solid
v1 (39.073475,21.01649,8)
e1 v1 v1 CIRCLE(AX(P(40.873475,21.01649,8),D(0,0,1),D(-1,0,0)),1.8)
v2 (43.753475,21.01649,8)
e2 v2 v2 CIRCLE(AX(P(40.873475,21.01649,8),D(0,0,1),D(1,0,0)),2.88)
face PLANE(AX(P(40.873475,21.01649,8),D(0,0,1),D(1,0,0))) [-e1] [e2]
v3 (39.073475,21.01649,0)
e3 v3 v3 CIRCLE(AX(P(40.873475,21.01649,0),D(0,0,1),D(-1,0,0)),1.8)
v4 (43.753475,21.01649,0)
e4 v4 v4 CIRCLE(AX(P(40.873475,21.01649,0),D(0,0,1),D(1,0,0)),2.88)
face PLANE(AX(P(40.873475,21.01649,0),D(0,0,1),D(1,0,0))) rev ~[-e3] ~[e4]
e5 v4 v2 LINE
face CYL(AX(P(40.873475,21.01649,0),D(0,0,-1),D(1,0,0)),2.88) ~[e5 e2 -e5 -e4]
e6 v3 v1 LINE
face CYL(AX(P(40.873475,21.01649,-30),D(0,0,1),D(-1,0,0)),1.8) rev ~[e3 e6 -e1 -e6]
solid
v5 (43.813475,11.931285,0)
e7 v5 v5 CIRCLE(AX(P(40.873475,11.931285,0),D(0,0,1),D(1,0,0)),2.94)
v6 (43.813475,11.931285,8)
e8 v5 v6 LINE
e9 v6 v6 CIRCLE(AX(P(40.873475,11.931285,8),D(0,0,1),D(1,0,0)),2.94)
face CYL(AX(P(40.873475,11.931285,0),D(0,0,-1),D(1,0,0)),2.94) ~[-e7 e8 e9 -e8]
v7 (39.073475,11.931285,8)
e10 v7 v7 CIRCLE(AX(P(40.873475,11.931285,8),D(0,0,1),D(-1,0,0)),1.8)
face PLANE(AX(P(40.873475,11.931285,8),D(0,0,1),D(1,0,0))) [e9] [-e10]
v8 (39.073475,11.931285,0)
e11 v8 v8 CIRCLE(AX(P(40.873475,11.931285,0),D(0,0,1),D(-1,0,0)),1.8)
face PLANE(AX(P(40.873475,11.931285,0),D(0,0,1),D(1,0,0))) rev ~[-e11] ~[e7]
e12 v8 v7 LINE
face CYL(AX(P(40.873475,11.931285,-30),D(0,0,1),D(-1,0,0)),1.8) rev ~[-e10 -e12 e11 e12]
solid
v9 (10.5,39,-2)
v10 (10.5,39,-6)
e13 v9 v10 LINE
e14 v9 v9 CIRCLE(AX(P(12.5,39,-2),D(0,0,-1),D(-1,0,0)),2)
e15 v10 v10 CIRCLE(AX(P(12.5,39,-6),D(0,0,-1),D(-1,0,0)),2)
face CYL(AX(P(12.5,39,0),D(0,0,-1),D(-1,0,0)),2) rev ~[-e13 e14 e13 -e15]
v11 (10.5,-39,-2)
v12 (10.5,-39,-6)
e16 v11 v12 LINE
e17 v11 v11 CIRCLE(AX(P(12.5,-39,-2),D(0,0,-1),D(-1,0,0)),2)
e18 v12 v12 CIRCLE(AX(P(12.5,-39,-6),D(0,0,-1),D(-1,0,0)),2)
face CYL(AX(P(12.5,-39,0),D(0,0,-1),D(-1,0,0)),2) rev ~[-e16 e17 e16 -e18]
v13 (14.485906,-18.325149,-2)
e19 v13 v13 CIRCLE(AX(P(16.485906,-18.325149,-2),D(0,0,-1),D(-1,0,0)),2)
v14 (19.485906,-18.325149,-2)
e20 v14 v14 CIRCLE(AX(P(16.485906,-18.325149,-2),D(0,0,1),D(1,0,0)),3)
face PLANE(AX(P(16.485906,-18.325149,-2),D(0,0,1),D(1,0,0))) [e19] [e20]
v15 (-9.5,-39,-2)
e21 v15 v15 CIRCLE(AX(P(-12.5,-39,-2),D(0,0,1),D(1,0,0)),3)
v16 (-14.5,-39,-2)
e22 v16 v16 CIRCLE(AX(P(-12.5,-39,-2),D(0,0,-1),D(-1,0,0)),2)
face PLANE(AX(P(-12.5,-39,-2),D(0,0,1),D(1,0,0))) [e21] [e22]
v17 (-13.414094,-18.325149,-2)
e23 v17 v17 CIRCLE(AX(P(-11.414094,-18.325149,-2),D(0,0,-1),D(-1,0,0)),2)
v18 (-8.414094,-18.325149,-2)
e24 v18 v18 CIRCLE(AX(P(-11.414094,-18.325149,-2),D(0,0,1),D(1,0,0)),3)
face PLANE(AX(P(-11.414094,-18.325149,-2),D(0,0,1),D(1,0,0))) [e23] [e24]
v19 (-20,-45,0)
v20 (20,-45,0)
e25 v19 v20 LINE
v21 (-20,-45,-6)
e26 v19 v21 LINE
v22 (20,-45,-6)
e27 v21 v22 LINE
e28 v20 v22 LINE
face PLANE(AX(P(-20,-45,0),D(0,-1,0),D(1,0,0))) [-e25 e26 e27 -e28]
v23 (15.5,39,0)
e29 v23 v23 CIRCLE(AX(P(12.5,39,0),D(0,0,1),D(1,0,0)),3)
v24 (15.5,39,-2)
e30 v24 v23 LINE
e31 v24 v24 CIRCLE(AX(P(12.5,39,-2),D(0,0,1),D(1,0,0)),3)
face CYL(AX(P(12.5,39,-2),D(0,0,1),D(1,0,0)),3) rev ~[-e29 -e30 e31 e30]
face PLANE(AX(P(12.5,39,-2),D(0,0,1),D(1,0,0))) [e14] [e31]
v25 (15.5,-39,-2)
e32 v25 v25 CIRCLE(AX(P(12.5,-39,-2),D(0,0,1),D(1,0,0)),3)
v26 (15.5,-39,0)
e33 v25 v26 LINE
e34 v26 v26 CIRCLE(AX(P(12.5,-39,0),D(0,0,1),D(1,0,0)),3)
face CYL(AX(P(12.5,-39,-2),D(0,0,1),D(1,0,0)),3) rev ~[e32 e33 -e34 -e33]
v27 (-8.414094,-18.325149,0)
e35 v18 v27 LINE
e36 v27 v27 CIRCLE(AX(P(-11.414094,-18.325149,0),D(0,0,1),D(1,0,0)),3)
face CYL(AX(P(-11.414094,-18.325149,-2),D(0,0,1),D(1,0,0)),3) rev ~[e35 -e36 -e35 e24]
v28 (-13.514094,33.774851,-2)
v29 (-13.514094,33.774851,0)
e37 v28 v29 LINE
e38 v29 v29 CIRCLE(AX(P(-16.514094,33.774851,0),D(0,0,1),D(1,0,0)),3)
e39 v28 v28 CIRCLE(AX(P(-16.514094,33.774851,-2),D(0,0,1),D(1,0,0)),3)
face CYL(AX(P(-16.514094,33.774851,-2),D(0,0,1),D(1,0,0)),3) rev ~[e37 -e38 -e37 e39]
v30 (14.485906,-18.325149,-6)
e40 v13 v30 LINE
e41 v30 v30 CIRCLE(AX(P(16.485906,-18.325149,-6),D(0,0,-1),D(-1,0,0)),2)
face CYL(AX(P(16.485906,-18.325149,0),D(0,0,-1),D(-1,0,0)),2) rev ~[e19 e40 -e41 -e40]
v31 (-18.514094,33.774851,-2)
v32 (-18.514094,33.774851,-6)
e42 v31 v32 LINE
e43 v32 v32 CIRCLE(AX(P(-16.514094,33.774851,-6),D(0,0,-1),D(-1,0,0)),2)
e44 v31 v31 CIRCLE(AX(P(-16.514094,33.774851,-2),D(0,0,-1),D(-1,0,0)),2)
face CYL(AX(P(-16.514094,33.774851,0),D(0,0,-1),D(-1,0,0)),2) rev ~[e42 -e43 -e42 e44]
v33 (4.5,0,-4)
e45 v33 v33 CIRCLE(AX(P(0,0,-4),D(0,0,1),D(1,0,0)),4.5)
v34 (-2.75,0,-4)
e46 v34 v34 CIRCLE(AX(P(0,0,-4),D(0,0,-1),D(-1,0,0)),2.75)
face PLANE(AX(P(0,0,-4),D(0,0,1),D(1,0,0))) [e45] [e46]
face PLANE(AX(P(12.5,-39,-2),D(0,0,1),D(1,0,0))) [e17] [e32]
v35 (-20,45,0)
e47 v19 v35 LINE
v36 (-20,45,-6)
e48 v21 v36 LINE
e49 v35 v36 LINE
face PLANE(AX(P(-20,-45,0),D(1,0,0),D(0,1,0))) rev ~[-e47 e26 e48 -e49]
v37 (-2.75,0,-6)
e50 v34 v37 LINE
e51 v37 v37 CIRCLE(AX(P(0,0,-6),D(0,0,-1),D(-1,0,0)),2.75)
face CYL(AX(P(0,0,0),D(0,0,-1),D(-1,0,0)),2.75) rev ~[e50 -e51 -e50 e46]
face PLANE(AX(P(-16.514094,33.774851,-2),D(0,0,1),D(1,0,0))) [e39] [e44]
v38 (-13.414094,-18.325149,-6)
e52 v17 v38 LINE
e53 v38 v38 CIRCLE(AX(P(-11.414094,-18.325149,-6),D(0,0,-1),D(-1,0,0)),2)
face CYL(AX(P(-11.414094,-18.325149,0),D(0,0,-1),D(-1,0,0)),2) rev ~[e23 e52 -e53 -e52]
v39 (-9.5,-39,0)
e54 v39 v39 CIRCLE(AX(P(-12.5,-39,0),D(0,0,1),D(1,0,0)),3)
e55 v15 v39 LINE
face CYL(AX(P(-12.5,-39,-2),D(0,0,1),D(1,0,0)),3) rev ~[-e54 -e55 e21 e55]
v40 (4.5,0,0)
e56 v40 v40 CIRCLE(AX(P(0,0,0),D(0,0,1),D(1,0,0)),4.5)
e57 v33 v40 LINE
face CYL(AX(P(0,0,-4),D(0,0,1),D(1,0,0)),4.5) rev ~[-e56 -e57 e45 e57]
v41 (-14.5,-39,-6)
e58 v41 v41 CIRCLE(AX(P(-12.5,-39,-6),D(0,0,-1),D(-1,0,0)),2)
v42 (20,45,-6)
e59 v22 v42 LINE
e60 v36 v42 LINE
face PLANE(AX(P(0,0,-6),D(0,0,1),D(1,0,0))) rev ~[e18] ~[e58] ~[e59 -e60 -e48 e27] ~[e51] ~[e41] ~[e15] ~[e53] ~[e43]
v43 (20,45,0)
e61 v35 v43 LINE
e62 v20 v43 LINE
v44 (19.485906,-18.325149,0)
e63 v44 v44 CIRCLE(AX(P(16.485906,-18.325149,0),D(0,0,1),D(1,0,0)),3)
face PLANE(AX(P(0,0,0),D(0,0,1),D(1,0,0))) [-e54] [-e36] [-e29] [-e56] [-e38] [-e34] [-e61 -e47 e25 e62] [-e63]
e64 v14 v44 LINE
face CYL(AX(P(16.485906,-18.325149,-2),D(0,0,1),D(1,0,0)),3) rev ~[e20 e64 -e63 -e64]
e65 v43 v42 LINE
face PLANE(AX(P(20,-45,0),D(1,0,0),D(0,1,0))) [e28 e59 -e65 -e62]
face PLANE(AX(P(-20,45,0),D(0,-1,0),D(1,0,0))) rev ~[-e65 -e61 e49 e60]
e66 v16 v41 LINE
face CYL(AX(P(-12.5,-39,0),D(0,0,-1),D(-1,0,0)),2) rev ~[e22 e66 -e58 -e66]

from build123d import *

# Parameters (mm, degrees)
F2_W                 = 40
F2_H                 = 90
F2_R                 = 15
F5_DEPTH             = 6
F6_D                 = 5.5
F6_DEPTH             = 30
F6_CBORE_D           = 9
F6_CBORE_DEPTH       = 4
F6_TIP               = 1.6523667023
F7_D                 = 4
F7_DEPTH             = 30
F7_CBORE_D           = 6
F7_CBORE_DEPTH       = 2
F7_TIP               = 1.2017212381
F7_ON_F4_D           = 4
F7_ON_F4_DEPTH       = 30
F7_ON_F4_CBORE_D     = 6
F7_ON_F4_CBORE_DEPTH = 2
F7_ON_F4_TIP         = 1.2017212381
F7_ON_F3_D           = 4
F7_ON_F3_DEPTH       = 30
F7_ON_F3_CBORE_D     = 6
F7_ON_F3_CBORE_DEPTH = 2
F7_ON_F3_TIP         = 1.2017212381
F2_R_2               = 2.88
F8_DEPTH             = 8
F2_R_3               = 2.94
F9_D                 = 3.6
F9_DEPTH             = 30
F9_TIP               = 1.0815491142
F9_2_D               = 3.6
F9_2_DEPTH           = 30
F9_2_TIP             = 1.0815491142


# Not quite as in the source:
# - a feature names something its author has since deleted; it is built from what else it names


with BuildPart() as f5:
    # F2 (on Top) → F5 (new body)
    with BuildSketch(Plane.XY):
        Rectangle(F2_W, F2_H)
        Circle(F2_R, mode=Mode.SUBTRACT)
        Circle(F2_R)
    extrude(amount=-F5_DEPTH)

    # F6
    with Locations(Plane.XY):
        with Locations((0, 0)):
            CounterBoreHole(F6_D / 2, F6_CBORE_D / 2, F6_CBORE_DEPTH, depth=F6_DEPTH)
            with Locations((0, 0, -(F6_DEPTH + F6_TIP / 2))):  # 118° drill point
                Cone(0, F6_D / 2, F6_TIP, mode=Mode.SUBTRACT)

    # F7
    with Locations(Plane.XY):
        with Locations((12.5, 39), (-16.5140936151, 33.7748509184), (-11.4140936151, -18.3251490816)):
            CounterBoreHole(F7_D / 2, F7_CBORE_D / 2, F7_CBORE_DEPTH, depth=F7_DEPTH)
            with Locations((0, 0, -(F7_DEPTH + F7_TIP / 2))):  # 118° drill point
                Cone(0, F7_D / 2, F7_TIP, mode=Mode.SUBTRACT)

    # F7 on F4
    with Locations(Plane.XY):
        with Locations((16.4859063849, -18.3251490816)):
            CounterBoreHole(F7_ON_F4_D / 2, F7_ON_F4_CBORE_D / 2, F7_ON_F4_CBORE_DEPTH, depth=F7_ON_F4_DEPTH)
            with Locations((0, 0, -(F7_ON_F4_DEPTH + F7_ON_F4_TIP / 2))):  # 118° drill point
                Cone(0, F7_ON_F4_D / 2, F7_ON_F4_TIP, mode=Mode.SUBTRACT)

    # F7 on F3
    with Locations(Plane.XY):
        with Locations((-12.5, -39), (12.5, -39)):
            CounterBoreHole(F7_ON_F3_D / 2, F7_ON_F3_CBORE_D / 2, F7_ON_F3_CBORE_DEPTH, depth=F7_ON_F3_DEPTH)
            with Locations((0, 0, -(F7_ON_F3_DEPTH + F7_ON_F3_TIP / 2))):  # 118° drill point
                Cone(0, F7_ON_F3_D / 2, F7_ON_F3_TIP, mode=Mode.SUBTRACT)


with BuildPart() as f8:
    # F2 (on Top) → F8 (new body)
    with BuildSketch(Plane.XY):
        with Locations((40.8734753728, 21.0164897144)):
            Circle(F2_R_2)
    extrude(amount=F8_DEPTH)

    # F9
    with Locations(Plane(origin=(0, 0, 0), x_dir=(1, 0, 0), z_dir=(0, 0, -1))):
        with Locations((40.8734753728, -11.9312852621), (40.8734753728, -21.0164897144)):
            Hole(F9_D / 2, depth=F9_DEPTH)
            with Locations((0, 0, -(F9_DEPTH + F9_TIP / 2))):  # 118° drill point
                Cone(0, F9_D / 2, F9_TIP, mode=Mode.SUBTRACT)


with BuildPart() as f8b:
    # F2 (on Top) → F8, piece 2 (new body)
    with BuildSketch(Plane.XY):
        with Locations((40.8734753728, 11.9312852621)):
            Circle(F2_R_3)
    extrude(amount=F8_DEPTH)

    # F9#2
    with Locations(Plane(origin=(0, 0, 0), x_dir=(1, 0, 0), z_dir=(0, 0, -1))):
        with Locations((40.8734753728, -11.9312852621), (40.8734753728, -21.0164897144)):
            Hole(F9_2_D / 2, depth=F9_2_DEPTH)
            with Locations((0, 0, -(F9_2_DEPTH + F9_2_TIP / 2))):  # 118° drill point
                Cone(0, F9_2_D / 2, F9_2_TIP, mode=Mode.SUBTRACT)


solid = Compound([f5.part, f8.part, f8b.part])
